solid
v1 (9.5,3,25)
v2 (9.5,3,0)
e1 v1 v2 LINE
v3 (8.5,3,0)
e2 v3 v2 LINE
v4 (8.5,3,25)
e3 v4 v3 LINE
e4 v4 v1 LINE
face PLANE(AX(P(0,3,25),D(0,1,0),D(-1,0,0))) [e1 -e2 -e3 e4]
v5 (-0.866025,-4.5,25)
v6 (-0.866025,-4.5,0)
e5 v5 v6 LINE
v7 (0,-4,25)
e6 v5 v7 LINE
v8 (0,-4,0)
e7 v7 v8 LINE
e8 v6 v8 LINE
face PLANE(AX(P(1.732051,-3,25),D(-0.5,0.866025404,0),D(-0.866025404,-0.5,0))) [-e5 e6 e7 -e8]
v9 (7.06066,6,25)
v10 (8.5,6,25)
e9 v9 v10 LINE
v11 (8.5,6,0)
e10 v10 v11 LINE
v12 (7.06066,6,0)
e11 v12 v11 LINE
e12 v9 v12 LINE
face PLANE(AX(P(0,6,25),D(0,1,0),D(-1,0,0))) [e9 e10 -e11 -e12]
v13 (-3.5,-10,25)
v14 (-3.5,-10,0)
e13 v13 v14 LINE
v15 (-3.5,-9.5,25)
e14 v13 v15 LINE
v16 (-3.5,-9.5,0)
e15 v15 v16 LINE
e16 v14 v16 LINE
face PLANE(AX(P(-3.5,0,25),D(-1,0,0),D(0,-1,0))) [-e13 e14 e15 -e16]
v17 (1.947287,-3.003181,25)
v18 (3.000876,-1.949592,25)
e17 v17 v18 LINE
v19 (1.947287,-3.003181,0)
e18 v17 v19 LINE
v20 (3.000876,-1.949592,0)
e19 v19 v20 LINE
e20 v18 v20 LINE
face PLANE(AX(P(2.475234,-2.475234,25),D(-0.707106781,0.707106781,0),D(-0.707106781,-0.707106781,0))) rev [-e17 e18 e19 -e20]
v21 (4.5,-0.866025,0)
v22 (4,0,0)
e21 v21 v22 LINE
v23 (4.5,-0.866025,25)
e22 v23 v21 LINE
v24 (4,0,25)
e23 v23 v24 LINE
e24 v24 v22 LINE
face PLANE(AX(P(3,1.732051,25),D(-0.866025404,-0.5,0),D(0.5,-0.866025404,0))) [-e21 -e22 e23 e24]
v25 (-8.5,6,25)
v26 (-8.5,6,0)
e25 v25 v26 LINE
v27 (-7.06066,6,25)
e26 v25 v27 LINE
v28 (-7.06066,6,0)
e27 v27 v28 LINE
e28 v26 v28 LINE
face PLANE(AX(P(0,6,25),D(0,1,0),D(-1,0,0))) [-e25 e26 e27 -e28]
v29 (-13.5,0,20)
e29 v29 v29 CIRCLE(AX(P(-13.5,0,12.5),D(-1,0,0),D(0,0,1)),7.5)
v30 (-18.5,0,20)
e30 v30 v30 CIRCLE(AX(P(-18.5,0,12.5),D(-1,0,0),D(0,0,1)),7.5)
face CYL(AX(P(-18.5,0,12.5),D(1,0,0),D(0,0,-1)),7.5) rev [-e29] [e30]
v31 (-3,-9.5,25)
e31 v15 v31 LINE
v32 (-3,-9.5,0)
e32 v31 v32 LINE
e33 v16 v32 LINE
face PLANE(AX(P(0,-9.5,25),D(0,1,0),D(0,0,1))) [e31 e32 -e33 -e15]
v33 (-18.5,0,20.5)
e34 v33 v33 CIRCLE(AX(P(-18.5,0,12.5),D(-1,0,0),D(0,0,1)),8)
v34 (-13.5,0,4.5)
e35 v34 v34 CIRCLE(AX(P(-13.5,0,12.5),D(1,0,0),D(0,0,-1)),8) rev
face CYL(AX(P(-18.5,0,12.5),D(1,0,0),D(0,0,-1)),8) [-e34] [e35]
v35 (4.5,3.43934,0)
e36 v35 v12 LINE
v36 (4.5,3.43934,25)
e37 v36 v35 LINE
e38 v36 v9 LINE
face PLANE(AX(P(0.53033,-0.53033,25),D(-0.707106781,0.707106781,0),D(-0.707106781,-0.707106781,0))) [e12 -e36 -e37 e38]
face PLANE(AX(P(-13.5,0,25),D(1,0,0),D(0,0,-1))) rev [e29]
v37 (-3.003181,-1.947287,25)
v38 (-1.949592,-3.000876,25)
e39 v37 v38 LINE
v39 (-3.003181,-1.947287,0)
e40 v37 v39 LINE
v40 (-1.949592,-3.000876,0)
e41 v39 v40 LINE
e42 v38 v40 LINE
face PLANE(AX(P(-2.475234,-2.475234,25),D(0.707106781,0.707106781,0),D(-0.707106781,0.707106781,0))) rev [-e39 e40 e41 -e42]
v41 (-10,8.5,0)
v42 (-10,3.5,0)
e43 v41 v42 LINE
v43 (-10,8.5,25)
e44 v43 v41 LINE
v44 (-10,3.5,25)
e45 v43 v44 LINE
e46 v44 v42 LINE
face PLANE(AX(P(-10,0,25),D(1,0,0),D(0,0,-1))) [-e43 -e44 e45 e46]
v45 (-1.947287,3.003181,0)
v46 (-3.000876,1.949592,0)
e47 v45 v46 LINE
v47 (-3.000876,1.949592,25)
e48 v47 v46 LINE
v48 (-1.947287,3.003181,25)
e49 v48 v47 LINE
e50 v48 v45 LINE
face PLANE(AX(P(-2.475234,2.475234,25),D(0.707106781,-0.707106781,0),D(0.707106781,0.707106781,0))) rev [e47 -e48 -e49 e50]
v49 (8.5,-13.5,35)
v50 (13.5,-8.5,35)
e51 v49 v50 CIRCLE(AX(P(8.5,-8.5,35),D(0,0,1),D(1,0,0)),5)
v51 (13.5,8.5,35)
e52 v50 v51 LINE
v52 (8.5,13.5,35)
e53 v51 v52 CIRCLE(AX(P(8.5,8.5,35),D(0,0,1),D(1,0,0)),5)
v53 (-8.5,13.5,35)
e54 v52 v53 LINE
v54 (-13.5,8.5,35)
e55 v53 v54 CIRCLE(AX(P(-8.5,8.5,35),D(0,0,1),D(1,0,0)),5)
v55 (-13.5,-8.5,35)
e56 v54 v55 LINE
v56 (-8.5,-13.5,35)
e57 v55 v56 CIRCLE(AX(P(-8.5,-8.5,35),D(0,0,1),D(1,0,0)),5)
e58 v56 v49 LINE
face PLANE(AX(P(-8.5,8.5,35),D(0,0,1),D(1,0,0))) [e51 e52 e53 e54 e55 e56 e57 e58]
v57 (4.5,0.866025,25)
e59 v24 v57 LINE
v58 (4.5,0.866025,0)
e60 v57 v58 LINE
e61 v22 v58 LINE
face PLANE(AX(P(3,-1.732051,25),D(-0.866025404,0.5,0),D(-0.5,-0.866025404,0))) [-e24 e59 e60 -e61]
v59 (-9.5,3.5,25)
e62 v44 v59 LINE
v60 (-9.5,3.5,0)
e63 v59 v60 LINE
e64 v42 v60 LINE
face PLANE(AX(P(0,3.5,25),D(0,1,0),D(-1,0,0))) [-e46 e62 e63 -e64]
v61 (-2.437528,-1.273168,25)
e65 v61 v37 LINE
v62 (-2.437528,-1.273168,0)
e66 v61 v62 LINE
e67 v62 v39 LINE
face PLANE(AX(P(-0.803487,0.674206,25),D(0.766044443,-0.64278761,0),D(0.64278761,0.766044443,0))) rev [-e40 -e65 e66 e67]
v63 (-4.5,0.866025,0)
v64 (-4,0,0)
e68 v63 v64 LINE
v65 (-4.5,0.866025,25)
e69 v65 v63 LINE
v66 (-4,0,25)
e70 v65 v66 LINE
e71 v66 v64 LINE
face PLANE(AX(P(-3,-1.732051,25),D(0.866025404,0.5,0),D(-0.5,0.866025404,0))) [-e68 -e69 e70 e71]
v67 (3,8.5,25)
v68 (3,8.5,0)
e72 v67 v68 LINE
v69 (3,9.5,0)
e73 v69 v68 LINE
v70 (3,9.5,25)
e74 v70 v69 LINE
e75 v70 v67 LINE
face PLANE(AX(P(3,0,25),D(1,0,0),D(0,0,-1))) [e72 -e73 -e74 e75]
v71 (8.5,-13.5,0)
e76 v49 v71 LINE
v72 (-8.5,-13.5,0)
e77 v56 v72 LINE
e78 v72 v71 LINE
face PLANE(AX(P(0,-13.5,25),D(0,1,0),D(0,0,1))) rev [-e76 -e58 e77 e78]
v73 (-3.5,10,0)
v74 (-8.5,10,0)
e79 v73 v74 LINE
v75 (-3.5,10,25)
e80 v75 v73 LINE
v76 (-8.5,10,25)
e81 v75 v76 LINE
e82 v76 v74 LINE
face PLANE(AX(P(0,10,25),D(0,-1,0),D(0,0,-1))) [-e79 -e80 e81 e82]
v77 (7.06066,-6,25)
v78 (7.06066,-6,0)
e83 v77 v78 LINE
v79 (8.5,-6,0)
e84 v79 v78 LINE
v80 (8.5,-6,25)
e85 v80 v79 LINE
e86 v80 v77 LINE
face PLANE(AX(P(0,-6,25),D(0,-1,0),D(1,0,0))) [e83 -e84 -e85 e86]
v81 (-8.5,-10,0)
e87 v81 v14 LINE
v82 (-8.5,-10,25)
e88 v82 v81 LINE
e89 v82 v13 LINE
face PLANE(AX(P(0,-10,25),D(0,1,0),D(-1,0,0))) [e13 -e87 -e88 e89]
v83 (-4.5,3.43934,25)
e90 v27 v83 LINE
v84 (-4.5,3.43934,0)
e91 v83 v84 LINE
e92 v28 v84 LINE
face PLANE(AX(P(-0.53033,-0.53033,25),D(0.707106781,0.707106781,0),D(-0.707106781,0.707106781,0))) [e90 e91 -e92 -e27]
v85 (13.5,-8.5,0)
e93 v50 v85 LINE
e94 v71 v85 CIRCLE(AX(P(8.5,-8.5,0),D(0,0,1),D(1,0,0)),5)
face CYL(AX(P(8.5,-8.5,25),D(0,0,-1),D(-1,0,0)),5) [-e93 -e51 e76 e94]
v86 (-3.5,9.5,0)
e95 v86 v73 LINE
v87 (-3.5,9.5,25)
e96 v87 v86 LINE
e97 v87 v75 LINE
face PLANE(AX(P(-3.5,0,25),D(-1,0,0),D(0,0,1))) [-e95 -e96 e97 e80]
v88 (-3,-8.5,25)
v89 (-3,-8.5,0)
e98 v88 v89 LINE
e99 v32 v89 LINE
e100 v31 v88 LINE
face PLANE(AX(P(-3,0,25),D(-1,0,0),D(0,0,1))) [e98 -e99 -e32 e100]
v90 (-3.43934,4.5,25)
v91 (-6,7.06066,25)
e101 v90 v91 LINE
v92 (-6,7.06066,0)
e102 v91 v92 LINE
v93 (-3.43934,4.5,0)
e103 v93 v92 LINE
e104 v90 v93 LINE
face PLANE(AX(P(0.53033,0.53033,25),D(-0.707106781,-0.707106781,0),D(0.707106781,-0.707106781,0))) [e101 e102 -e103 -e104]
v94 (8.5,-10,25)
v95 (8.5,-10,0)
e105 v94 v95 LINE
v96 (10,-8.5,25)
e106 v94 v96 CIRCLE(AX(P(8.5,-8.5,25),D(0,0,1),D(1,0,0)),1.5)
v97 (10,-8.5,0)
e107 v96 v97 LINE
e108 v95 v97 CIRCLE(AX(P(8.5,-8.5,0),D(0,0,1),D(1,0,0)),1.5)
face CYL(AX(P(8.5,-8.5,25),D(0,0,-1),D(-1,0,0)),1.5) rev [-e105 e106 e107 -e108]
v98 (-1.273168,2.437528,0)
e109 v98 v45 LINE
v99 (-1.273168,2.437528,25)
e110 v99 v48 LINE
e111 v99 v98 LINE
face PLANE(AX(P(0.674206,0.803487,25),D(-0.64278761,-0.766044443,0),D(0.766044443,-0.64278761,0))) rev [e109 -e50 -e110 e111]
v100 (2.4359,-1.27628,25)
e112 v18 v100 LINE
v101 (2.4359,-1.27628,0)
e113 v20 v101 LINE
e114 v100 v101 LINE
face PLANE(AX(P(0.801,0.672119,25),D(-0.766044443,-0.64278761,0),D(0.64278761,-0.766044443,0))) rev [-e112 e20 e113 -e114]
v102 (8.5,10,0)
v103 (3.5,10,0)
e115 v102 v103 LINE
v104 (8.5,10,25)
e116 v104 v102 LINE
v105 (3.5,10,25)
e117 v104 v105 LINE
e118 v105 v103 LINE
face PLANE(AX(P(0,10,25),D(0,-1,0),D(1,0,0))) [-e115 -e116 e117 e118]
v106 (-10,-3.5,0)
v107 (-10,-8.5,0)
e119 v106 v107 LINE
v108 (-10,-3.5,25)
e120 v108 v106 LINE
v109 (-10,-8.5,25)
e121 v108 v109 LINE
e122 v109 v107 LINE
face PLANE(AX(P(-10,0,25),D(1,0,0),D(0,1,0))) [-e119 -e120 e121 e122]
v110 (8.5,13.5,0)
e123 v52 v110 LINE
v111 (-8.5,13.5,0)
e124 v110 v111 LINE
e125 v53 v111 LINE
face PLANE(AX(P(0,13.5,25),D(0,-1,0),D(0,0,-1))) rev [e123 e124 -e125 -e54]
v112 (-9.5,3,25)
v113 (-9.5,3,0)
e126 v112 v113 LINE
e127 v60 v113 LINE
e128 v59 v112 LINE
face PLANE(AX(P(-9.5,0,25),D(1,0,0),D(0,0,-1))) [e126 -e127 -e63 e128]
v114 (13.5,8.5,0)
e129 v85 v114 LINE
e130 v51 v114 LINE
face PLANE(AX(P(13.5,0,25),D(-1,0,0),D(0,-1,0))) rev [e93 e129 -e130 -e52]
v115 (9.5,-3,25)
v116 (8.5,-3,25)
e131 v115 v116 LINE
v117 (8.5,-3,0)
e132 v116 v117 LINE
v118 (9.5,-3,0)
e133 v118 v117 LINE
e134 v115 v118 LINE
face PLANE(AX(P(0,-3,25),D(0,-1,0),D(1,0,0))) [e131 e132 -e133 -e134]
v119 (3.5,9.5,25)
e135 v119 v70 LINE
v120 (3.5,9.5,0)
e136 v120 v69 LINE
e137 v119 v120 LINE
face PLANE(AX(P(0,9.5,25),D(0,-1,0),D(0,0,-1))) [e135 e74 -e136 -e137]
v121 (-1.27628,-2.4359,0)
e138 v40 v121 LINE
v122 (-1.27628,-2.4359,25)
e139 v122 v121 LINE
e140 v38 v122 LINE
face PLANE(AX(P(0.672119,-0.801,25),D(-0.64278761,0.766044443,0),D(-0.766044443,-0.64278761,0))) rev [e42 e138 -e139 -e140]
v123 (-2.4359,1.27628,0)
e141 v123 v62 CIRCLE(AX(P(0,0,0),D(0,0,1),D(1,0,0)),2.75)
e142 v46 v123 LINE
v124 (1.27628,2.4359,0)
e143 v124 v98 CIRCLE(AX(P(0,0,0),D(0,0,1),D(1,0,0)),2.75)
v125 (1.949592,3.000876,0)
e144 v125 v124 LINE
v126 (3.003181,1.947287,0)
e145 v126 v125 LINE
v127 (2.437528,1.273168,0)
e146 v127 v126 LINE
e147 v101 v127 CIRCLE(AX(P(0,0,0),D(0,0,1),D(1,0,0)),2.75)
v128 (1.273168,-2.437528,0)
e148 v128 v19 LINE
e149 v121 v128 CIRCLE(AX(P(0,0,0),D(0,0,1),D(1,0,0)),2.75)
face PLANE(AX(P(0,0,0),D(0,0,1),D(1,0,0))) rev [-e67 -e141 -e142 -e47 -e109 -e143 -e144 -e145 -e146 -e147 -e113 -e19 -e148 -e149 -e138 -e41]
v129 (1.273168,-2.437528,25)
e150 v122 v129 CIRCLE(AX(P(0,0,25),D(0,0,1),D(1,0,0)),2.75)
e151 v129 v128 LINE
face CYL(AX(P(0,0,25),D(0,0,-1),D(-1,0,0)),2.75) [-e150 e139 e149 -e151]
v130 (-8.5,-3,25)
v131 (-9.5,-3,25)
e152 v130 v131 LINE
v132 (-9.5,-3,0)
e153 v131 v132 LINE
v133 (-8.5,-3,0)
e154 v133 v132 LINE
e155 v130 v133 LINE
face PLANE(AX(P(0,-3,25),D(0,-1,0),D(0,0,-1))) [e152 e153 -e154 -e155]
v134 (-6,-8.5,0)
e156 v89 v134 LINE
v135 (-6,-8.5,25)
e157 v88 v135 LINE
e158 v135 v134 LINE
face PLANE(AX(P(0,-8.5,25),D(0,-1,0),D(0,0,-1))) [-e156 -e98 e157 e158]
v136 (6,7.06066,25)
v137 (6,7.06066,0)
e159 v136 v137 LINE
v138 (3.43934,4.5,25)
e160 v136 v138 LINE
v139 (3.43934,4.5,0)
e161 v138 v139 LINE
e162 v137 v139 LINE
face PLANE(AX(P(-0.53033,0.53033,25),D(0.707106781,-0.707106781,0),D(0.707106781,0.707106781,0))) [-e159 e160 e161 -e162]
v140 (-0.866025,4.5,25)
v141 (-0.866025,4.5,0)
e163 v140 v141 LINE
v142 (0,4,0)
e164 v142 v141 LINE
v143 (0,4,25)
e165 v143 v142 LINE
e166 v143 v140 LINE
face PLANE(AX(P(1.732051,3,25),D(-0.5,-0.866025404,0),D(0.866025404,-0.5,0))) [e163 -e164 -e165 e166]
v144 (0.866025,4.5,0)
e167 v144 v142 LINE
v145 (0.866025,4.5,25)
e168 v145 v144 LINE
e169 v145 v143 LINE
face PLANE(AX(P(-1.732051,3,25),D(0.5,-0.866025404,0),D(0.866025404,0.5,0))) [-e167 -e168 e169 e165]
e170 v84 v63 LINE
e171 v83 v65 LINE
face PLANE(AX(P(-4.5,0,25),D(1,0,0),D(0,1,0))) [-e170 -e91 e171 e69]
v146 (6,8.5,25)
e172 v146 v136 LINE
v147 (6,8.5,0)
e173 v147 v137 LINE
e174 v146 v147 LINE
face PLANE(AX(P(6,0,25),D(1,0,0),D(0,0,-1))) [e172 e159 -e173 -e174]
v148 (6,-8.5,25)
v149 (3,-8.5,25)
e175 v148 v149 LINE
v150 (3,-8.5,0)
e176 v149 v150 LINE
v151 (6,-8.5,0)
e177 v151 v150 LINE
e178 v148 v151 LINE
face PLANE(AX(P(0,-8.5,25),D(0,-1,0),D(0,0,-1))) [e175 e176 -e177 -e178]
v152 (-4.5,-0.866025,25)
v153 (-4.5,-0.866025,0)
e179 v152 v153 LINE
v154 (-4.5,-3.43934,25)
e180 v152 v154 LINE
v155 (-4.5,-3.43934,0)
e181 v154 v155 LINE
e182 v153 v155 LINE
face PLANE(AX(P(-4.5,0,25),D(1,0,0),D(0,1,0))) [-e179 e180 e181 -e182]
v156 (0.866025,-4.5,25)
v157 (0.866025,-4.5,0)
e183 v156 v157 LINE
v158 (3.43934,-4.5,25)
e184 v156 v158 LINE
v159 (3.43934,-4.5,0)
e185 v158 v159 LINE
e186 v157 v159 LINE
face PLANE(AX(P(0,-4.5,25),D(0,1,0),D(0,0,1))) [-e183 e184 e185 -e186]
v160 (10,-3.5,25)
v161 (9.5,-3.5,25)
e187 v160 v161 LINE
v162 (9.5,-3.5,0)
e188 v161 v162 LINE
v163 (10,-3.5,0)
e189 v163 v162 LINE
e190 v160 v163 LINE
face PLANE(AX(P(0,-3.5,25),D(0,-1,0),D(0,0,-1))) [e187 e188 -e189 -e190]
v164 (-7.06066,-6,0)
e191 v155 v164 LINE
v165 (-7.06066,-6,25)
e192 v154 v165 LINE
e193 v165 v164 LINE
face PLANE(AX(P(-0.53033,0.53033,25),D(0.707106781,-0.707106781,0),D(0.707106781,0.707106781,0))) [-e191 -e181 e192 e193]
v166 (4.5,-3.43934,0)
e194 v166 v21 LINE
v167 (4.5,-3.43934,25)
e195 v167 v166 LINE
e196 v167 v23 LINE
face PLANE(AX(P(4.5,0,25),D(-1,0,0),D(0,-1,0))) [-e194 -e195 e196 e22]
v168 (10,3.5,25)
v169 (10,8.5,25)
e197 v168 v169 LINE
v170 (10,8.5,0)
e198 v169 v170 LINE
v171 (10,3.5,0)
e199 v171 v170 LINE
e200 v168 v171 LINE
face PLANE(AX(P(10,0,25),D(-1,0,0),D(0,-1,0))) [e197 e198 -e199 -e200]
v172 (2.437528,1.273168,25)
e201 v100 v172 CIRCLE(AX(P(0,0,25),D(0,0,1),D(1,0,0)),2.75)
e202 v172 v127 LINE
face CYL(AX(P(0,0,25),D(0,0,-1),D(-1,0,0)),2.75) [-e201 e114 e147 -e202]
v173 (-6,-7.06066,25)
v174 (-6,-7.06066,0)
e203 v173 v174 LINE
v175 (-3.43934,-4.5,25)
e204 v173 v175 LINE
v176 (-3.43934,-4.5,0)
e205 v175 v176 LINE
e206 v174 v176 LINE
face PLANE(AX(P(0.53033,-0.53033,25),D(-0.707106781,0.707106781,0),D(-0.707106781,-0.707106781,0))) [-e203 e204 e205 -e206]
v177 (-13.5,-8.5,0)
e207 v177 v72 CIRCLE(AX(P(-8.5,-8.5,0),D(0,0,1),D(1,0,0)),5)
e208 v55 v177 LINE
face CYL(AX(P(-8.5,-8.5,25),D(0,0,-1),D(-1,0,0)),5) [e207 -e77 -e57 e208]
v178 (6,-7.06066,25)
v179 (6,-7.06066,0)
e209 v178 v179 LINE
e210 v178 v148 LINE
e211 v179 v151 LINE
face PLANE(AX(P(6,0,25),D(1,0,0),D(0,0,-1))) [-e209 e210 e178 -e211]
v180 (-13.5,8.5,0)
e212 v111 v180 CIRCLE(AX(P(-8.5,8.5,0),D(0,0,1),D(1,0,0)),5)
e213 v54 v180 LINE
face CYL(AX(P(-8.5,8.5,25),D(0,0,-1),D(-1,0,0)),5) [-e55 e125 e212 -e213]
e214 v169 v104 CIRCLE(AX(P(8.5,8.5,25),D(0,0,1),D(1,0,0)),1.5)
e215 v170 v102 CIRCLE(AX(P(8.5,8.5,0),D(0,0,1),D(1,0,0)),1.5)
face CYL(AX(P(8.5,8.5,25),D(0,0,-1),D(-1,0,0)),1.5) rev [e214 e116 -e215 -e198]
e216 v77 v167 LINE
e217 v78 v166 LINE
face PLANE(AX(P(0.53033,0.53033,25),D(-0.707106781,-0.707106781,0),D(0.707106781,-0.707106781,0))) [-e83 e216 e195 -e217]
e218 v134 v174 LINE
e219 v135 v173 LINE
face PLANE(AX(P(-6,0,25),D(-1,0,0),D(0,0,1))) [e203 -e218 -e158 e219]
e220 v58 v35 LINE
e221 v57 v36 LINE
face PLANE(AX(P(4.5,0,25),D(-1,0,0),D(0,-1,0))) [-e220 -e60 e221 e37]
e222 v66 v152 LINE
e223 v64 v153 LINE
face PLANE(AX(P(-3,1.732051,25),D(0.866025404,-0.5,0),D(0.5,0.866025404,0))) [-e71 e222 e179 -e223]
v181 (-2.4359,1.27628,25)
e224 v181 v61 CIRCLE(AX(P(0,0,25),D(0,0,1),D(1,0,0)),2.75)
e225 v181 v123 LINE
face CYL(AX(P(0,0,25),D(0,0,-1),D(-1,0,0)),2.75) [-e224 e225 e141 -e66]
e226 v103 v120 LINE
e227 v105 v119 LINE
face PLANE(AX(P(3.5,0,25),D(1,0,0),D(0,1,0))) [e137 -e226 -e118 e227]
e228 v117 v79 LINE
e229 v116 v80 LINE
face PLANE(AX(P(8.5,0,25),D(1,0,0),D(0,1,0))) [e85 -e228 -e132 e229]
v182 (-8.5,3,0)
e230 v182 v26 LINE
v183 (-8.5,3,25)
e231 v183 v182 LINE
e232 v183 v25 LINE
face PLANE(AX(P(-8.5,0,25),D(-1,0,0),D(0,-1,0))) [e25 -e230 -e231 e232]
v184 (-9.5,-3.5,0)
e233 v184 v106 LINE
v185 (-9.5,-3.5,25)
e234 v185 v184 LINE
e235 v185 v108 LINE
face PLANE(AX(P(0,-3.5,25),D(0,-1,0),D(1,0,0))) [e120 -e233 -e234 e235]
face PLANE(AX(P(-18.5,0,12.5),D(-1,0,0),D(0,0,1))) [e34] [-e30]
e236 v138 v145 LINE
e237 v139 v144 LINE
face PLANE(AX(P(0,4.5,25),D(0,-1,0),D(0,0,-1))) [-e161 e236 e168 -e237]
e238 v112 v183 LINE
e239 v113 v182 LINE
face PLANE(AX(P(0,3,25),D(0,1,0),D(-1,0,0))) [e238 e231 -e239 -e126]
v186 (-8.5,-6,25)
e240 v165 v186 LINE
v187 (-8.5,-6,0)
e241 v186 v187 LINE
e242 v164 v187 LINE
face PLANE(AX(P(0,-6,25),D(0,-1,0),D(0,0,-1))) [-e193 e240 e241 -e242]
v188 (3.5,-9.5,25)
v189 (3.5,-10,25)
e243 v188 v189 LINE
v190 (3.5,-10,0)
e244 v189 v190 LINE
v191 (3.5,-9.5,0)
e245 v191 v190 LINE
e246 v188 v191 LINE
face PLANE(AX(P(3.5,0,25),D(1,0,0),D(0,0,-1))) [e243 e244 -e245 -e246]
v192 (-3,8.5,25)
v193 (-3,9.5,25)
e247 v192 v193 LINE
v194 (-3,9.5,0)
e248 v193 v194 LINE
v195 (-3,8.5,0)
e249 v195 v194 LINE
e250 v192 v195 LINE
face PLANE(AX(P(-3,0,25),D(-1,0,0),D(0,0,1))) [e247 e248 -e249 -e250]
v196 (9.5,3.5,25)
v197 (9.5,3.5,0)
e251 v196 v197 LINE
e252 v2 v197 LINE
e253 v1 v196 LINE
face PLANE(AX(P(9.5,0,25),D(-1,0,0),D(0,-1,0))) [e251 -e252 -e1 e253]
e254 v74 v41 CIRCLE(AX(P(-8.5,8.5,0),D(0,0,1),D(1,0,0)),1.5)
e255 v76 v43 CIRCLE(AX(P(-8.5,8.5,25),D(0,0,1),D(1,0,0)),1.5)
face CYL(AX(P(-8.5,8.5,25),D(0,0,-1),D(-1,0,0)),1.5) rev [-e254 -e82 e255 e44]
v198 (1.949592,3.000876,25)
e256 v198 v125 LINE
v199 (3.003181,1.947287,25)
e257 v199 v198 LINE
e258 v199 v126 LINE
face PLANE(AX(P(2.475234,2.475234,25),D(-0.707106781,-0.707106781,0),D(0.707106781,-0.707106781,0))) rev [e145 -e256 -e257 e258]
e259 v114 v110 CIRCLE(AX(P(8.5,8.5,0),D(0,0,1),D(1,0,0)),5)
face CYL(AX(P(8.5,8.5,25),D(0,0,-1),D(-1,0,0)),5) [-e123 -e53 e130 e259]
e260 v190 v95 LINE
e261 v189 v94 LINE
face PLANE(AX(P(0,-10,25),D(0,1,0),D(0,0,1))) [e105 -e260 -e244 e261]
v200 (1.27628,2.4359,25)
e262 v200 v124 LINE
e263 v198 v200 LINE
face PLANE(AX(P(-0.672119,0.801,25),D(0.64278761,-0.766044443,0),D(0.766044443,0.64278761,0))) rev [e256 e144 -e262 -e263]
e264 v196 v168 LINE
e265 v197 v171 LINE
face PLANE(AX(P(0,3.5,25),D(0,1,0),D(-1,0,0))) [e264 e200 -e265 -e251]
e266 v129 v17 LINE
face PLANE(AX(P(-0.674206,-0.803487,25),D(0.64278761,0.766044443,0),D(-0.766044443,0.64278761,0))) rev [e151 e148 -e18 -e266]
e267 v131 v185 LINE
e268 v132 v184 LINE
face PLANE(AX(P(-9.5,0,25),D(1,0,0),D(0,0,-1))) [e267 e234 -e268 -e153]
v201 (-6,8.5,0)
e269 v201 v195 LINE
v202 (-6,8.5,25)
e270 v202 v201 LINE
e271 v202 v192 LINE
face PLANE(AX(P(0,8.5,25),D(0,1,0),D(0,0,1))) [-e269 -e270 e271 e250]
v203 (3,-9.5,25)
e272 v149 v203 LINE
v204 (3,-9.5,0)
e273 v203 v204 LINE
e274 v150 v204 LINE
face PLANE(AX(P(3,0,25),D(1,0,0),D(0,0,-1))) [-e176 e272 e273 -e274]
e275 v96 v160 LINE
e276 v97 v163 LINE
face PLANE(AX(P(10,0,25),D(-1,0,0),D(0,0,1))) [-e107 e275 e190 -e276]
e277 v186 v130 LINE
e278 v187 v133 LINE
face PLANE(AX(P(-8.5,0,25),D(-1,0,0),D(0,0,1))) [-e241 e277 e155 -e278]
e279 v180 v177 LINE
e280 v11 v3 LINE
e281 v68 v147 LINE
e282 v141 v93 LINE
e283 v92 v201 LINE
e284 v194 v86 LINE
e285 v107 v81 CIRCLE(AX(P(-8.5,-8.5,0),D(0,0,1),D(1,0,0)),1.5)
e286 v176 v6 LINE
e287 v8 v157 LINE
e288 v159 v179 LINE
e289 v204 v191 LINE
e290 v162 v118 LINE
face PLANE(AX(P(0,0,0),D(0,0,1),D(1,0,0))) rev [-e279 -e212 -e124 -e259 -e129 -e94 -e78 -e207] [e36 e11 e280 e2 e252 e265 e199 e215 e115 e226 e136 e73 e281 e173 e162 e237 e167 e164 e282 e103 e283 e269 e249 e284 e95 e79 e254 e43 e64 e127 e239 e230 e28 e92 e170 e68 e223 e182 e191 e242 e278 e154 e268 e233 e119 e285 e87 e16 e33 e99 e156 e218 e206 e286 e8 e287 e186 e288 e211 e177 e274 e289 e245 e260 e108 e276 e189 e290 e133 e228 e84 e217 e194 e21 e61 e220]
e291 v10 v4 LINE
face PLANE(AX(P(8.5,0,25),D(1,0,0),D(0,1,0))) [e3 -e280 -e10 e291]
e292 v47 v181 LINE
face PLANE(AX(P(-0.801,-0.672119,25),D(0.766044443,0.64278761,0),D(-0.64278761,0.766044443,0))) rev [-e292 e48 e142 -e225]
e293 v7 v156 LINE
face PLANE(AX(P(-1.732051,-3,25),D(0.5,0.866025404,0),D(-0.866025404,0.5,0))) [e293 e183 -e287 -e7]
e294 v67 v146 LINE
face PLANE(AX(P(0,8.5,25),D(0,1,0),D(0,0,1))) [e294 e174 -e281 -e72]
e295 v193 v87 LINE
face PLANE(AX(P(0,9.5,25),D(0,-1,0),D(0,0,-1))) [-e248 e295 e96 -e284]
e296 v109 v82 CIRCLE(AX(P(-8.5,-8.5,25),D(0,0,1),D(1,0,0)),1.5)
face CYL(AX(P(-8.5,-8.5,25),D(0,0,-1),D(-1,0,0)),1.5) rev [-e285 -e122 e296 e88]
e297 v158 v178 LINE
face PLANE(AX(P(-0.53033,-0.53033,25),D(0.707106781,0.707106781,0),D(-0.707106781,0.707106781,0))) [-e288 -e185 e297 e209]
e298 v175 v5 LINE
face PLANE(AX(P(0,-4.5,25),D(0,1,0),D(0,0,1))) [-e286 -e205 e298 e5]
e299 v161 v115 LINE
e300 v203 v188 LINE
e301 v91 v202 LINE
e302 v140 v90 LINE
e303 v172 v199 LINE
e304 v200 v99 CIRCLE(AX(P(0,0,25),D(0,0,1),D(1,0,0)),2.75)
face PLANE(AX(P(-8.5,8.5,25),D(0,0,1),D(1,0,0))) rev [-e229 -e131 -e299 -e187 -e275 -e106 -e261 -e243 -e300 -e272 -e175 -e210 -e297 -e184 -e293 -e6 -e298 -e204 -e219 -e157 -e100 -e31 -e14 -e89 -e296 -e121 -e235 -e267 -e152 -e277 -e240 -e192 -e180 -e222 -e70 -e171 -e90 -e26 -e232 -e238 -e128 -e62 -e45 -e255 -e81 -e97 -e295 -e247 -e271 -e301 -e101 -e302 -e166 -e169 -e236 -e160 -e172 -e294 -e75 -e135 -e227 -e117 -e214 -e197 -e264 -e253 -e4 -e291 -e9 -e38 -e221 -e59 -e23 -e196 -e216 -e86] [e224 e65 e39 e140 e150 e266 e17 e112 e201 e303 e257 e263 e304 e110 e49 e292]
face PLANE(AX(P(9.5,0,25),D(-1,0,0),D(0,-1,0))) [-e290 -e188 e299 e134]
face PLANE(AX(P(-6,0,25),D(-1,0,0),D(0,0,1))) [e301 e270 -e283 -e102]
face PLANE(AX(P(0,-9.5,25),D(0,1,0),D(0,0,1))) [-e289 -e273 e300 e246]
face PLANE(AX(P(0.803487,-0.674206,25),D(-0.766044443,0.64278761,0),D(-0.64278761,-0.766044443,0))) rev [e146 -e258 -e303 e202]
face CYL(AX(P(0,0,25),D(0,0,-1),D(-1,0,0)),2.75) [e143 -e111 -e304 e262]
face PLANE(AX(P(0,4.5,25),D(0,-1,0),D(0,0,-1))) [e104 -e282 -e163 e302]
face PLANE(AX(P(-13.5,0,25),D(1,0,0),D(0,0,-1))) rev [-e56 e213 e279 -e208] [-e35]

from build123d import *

# Parameters (mm, degrees)
BOSS_EXTRU_5_DEPTH = 25
ESQUISSE7_R        = 8
ESQUISSE7_R_2      = 7.5
BOSS_EXTRU_7_DEPTH = 5
BOSS_EXTRU_6_DEPTH = 10


# Read off the part's stored shape, not the designer's step: Boss.-Extru.5
with BuildPart() as part:
    # Boss.-Extru.5 outline → Boss.-Extru.5 (new body)
    # profile 1 of 2: a face of its own
    with BuildSketch(Plane.XY):
        with BuildLine():
            Line((-8.5, -13.5), (8.5, -13.5))
            ThreePointArc((8.5, -13.5), (12.035533906, -12.035533906), (13.5, -8.5))
            Line((13.5, -8.5), (13.5, 8.5))
            ThreePointArc((13.5, 8.5), (12.035533906, 12.035533906), (8.5, 13.5))
            Line((8.5, 13.5), (-8.5, 13.5))
            ThreePointArc((-8.5, 13.5), (-12.035533906, 12.035533906), (-13.5, 8.5))
            Line((-13.5, 8.5), (-13.5, -8.5))
            ThreePointArc((-13.5, -8.5), (-12.035533906, -12.035533906), (-8.5, -13.5))
        make_face()
        with BuildLine():
            Line((-10, 3.5), (-10, 8.5))
            ThreePointArc((-10, 8.5), (-9.560660172, 9.560660172), (-8.5, 10))
            Line((-8.5, 10), (-3.5, 10))
            Line((-3.5, 10), (-3.5, 9.5))
            Line((-3.5, 9.5), (-3, 9.5))
            Line((-3, 9.5), (-3, 8.5))
            Line((-3, 8.5), (-6, 8.5))
            Line((-6, 8.5), (-6, 7.060660172))
            Line((-6, 7.060660172), (-3.439339828, 4.5))
            Line((-3.439339828, 4.5), (-0.866025404, 4.5))
            Line((-0.866025404, 4.5), (0, 4))
            Line((0, 4), (0.866025404, 4.5))
            Line((0.866025404, 4.5), (3.439339828, 4.5))
            Line((3.439339828, 4.5), (6, 7.060660172))
            Line((6, 7.060660172), (6, 8.5))
            Line((6, 8.5), (3, 8.5))
            Line((3, 8.5), (3, 9.5))
            Line((3, 9.5), (3.5, 9.5))
            Line((3.5, 9.5), (3.5, 10))
            Line((3.5, 10), (8.5, 10))
            ThreePointArc((8.5, 10), (9.560660172, 9.560660172), (10, 8.5))
            Line((10, 8.5), (10, 3.5))
            Line((10, 3.5), (9.5, 3.5))
            Line((9.5, 3.5), (9.5, 3))
            Line((9.5, 3), (8.5, 3))
            Line((8.5, 3), (8.5, 6))
            Line((8.5, 6), (7.060660172, 6))
            Line((7.060660172, 6), (4.5, 3.439339828))
            Line((4.5, 3.439339828), (4.5, 0.866025404))
            Line((4.5, 0.866025404), (4, 0))
            Line((4, 0), (4.5, -0.866025404))
            Line((4.5, -0.866025404), (4.5, -3.439339828))
            Line((4.5, -3.439339828), (7.060660172, -6))
            Line((7.060660172, -6), (8.5, -6))
            Line((8.5, -6), (8.5, -3))
            Line((8.5, -3), (9.5, -3))
            Line((9.5, -3), (9.5, -3.5))
            Line((9.5, -3.5), (10, -3.5))
            Line((10, -3.5), (10, -8.5))
            ThreePointArc((10, -8.5), (9.560660172, -9.560660172), (8.5, -10))
            Line((8.5, -10), (3.5, -10))
            Line((3.5, -10), (3.5, -9.5))
            Line((3.5, -9.5), (3, -9.5))
            Line((3, -9.5), (3, -8.5))
            Line((3, -8.5), (6, -8.5))
            Line((6, -8.5), (6, -7.060660172))
            Line((6, -7.060660172), (3.439339828, -4.5))
            Line((3.439339828, -4.5), (0.866025404, -4.5))
            Line((0.866025404, -4.5), (0, -4))
            Line((0, -4), (-0.866025404, -4.5))
            Line((-0.866025404, -4.5), (-3.439339828, -4.5))
            Line((-3.439339828, -4.5), (-6, -7.060660172))
            Line((-6, -7.060660172), (-6, -8.5))
            Line((-6, -8.5), (-3, -8.5))
            Line((-3, -8.5), (-3, -9.5))
            Line((-3, -9.5), (-3.5, -9.5))
            Line((-3.5, -9.5), (-3.5, -10))
            Line((-3.5, -10), (-8.5, -10))
            ThreePointArc((-8.5, -10), (-9.560660172, -9.560660172), (-10, -8.5))
            Line((-10, -8.5), (-10, -3.5))
            Line((-10, -3.5), (-9.5, -3.5))
            Line((-9.5, -3.5), (-9.5, -3))
            Line((-9.5, -3), (-8.5, -3))
            Line((-8.5, -3), (-8.5, -6))
            Line((-8.5, -6), (-7.060660172, -6))
            Line((-7.060660172, -6), (-4.5, -3.439339828))
            Line((-4.5, -3.439339828), (-4.5, -0.866025404))
            Line((-4.5, -0.866025404), (-4, 0))
            Line((-4, 0), (-4.5, 0.866025404))
            Line((-4.5, 0.866025404), (-4.5, 3.439339828))
            Line((-4.5, 3.439339828), (-7.060660172, 6))
            Line((-7.060660172, 6), (-8.5, 6))
            Line((-8.5, 6), (-8.5, 3))
            Line((-8.5, 3), (-9.5, 3))
            Line((-9.5, 3), (-9.5, 3.5))
            Line((-9.5, 3.5), (-10, 3.5))
        make_face(mode=Mode.SUBTRACT)
    # profile 2 of 2: a face of its own
    with BuildSketch(Plane.XY):
        with BuildLine():
            Line((1.949592103, 3.000876196), (1.276279893, 2.435900169))
            ThreePointArc((1.276279893, 2.435900169), (0.001756003, 2.749999439), (-1.273167982, 2.43752811))
            Line((-1.273167982, 2.43752811), (-1.947287092, 3.003181207))
            Line((-1.947287092, 3.003181207), (-3.000876196, 1.949592103))
            Line((-3.000876196, 1.949592103), (-2.435900169, 1.276279893))
            ThreePointArc((-2.435900169, 1.276279893), (-2.749999439, 0.001756003), (-2.43752811, -1.273167982))
            Line((-2.43752811, -1.273167982), (-3.003181207, -1.947287092))
            Line((-3.003181207, -1.947287092), (-1.949592103, -3.000876196))
            Line((-1.949592103, -3.000876196), (-1.276279893, -2.435900169))
            ThreePointArc((-1.276279893, -2.435900169), (-0.001756003, -2.749999439), (1.273167982, -2.43752811))
            Line((1.273167982, -2.43752811), (1.947287092, -3.003181207))
            Line((1.947287092, -3.003181207), (3.000876196, -1.949592103))
            Line((3.000876196, -1.949592103), (2.435900169, -1.276279893))
            ThreePointArc((2.435900169, -1.276279893), (2.749999439, -0.001756003), (2.43752811, 1.273167982))
            Line((2.43752811, 1.273167982), (3.003181207, 1.947287092))
            Line((3.003181207, 1.947287092), (1.949592103, 3.000876196))
        make_face()
    extrude(amount=BOSS_EXTRU_5_DEPTH)

    # Esquisse7 → Boss.-Extru.7 (add)
    with BuildSketch(Plane.ZY.offset(13.5)):
        with Locations(Location((12.5, 0, 0), (0, 0, 180))):
            Circle(ESQUISSE7_R)
        with Locations((12.5, 0)):
            Circle(ESQUISSE7_R_2, mode=Mode.SUBTRACT)
    extrude(amount=BOSS_EXTRU_7_DEPTH)

    # Esquisse6 → Boss.-Extru.6 (add)
    with BuildSketch(Plane.XY.offset(25)):
        with BuildLine():
            Line((-13.5, 8.5), (-13.5, -8.5))
            ThreePointArc((-13.5, -8.5), (-12.035533906, -12.035533906), (-8.5, -13.5))
            Line((-8.5, -13.5), (8.5, -13.5))
            ThreePointArc((8.5, -13.5), (12.035533906, -12.035533906), (13.5, -8.5))
            Line((13.5, -8.5), (13.5, 8.5))
            ThreePointArc((13.5, 8.5), (12.035533906, 12.035533906), (8.5, 13.5))
            Line((8.5, 13.5), (-8.5, 13.5))
            ThreePointArc((-8.5, 13.5), (-12.035533906, 12.035533906), (-13.5, 8.5))
        make_face()
    extrude(amount=BOSS_EXTRU_6_DEPTH)


solid = part.part
